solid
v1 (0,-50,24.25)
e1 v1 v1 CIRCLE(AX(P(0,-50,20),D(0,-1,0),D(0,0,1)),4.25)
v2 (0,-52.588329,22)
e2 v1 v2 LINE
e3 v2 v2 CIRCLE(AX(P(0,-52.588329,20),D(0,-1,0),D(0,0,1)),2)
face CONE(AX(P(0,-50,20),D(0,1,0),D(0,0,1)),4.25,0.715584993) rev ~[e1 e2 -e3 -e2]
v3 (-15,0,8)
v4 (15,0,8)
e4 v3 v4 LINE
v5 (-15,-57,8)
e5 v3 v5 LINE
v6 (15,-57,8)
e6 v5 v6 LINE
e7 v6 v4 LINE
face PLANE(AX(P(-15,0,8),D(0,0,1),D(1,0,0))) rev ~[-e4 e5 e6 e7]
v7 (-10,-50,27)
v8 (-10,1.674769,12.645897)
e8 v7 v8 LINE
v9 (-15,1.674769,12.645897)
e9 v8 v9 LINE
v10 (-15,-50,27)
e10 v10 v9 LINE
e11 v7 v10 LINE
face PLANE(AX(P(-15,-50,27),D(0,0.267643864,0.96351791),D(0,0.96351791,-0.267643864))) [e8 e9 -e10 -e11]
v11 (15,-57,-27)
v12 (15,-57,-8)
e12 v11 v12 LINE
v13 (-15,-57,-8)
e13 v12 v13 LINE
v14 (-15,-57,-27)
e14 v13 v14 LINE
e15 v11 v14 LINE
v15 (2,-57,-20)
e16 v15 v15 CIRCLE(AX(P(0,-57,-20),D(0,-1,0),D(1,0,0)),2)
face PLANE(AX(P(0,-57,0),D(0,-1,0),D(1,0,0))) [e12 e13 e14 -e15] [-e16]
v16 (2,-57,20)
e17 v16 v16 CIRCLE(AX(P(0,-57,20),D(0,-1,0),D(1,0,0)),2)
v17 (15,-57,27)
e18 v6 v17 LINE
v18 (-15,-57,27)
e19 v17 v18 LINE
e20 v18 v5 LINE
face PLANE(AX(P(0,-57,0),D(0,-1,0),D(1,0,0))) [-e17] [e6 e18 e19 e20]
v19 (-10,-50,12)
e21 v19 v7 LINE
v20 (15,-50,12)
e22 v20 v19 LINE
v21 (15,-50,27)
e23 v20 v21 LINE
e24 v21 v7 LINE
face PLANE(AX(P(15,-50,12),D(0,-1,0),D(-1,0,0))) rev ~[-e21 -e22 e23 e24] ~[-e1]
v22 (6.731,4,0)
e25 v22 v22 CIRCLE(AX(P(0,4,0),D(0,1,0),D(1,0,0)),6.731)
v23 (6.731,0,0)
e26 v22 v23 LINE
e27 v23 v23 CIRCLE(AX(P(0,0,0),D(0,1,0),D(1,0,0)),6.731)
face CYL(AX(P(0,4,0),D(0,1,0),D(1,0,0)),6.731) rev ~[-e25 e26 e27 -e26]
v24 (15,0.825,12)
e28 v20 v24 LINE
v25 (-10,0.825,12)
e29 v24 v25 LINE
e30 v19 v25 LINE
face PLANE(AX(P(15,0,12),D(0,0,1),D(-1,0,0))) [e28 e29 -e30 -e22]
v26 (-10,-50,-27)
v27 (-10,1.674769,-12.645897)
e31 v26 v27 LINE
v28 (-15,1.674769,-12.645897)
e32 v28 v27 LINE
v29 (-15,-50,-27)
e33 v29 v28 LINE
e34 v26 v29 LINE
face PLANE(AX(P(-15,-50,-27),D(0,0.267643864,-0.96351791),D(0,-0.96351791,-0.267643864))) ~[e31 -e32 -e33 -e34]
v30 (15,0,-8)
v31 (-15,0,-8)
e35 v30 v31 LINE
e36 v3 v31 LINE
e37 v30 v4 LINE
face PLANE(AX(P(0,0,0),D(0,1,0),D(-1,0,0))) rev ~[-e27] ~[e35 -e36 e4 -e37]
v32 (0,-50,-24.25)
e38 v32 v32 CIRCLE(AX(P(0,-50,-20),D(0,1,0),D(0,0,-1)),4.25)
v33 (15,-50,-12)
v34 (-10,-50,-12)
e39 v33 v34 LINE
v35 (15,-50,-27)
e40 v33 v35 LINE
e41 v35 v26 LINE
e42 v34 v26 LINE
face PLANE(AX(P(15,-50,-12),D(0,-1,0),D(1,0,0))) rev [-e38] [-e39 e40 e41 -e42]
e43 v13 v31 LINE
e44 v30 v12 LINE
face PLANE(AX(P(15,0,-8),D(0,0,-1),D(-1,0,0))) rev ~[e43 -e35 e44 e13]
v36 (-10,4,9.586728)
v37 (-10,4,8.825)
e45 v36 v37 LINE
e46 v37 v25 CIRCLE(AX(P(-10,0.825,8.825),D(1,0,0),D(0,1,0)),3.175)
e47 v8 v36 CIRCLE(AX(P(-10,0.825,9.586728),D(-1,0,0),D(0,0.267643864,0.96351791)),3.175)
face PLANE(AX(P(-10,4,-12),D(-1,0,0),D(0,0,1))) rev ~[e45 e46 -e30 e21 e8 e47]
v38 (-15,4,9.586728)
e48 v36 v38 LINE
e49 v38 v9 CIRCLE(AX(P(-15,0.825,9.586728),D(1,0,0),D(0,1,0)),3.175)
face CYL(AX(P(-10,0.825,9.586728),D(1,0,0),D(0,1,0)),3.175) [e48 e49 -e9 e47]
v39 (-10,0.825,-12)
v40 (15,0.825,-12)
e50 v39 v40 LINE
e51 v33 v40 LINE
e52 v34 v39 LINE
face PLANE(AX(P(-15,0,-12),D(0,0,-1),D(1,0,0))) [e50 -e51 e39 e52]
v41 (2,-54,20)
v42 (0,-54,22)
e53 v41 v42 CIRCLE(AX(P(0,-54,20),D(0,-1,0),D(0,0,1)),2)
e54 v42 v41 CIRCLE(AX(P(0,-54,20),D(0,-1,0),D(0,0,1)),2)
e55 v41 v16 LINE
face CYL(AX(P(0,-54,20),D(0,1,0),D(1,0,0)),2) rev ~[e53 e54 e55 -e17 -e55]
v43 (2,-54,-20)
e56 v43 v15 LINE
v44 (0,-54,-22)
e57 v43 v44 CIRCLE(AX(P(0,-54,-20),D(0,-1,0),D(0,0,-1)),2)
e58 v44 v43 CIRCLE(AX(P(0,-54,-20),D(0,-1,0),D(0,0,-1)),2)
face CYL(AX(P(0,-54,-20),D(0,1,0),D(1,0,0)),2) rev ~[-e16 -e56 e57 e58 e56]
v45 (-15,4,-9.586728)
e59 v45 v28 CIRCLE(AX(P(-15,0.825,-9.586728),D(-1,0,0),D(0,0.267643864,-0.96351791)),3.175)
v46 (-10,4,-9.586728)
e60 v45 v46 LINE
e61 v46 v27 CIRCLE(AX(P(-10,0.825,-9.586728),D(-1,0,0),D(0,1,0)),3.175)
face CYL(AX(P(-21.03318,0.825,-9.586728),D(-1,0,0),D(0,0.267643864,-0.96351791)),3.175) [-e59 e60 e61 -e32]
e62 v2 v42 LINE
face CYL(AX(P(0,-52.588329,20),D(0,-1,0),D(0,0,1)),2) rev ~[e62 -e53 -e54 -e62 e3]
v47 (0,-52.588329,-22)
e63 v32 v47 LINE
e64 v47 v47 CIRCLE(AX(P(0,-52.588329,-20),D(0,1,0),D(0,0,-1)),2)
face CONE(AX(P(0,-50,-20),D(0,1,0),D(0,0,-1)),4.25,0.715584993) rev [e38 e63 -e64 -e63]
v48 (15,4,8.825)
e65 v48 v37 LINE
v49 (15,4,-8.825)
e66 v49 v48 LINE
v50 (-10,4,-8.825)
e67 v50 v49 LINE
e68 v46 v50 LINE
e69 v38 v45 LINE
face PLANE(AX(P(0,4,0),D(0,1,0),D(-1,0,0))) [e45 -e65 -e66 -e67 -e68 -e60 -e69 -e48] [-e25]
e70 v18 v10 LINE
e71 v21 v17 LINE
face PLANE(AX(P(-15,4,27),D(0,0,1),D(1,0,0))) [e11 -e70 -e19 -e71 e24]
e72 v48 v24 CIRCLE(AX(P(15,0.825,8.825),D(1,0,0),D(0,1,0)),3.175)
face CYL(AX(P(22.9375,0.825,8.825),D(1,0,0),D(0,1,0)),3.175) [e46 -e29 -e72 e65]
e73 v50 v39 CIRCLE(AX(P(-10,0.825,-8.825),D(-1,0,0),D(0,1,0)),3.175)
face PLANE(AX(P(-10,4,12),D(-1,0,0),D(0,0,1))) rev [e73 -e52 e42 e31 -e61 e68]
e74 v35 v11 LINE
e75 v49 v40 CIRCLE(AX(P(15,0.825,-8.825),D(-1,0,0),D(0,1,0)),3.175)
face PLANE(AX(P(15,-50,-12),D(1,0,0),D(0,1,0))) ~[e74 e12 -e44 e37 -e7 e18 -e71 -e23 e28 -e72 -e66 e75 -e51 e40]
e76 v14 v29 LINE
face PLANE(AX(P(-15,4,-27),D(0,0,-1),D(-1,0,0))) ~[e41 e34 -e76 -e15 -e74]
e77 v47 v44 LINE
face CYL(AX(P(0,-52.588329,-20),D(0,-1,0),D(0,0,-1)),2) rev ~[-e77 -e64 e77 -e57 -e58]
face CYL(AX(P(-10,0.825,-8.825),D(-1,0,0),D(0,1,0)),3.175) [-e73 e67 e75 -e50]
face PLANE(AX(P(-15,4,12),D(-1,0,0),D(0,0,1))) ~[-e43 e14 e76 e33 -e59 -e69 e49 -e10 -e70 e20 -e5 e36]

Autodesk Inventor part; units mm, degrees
ref_plane "YZ Plane" through (0, 0, 0) normal (1, 0, 0) x (0, 1, 0)
ref_plane "XZ Plane" through (0, 0, 0) normal (0, 1, 0) x (-1, 0, 0)
ref_plane "XY Plane" through (0, 0, 0) normal (0, 0, 1) x (1, 0, 0)
sketch "Sketch2" plane through (0, 0, 0) normal (0, 1, 0) x (-1, 0, 0)
  line L0 (-15, 12) -> (15, 12)
  line L1 (15, 12) -> (15, -12)
  line L2 (15, -12) -> (-15, -12)
  line L3 (-15, -12) -> (-15, 12)
  line L4 (-15, 12) -> (15, -12) construction
  line L5 (15, 12) -> (-15, -12) construction
  point P0 (0, 0)
  dimension "d5" = 30
  dimension "d6" = 24
extrude "Extrusion2" add sketch "Sketch2" along normal blind 4
sketch "Sketch3" plane through (0, 0, 0) normal (0, -1, 0) x (1, 0, 0)
  line L0 (-15, 12) -> (15, 12) projected
  line L1 (15, 12) -> (-15, 12)
  line L2 (-15, 12) -> (-15, 8)
  line L3 (-15, 8) -> (15, 8)
  line L4 (15, 8) -> (15, 12)
  line L5 (15, -12) -> (-15, -12) projected
  line L6 (-15, -12) -> (15, -12)
  line L7 (15, -12) -> (15, -8)
  line L8 (15, -8) -> (-15, -8)
  line L9 (-15, -8) -> (-15, -12)
  point P0 (0, 0)
  dimension "d9" = 4
  dimension "d10" = 4
extrude "Extrusion3" add sketch "Sketch3" along normal blind 54
sketch "Sketch4" plane through (-15, 4, 12) normal (0, 0, 1) x (1, 0, 0)
  line L0 (0, -58) -> (30, -58) projected
  line L1 (30, -4) -> (30, -58) projected
  line L2 (0, -58) -> (30, -58)
  line L3 (30, -58) -> (30, -54)
  line L4 (30, -54) -> (0, -54)
  line L5 (0, -54) -> (0, -58)
  point P0 (15, -4)
  dimension "d13" = 4
extrude "Extrusion4" add sketch "Sketch4" along normal blind 15
ref_plane "Work Plane1" through (-15, 0, 0) normal (0, 0, 1) x (1, 0, 0)
sketch "Sketch5" plane through (0, 4, 0) normal (0, 1, 0) x (1, 0, 0)
  line L0 (15, -8) -> (15, -27) construction
  line L1 (-15, 12) -> (15, 12) construction
  line L2 (15, -12.0945) -> (-15, 12) construction
  line L3 (-15, 12) -> (15, 12) construction
  line L4 (15, 12) -> (-15, -12.0945) construction
  circle A0 centre (0, 0) radius 6.731
  dimension "d16" = 13.462
extrude "Extrusion5" cut sketch "Sketch5" against normal blind 15.1625
sketch "Sketch6" plane through (-15, -50, 12) normal (0, 1, 0) x (1, 0, 0)
  line L0 (30, -15) -> (0, -15) construction
  line L1 (15, -15) -> (15, -8) construction
  point P0 (15, 12)
  dimension "d19" = 7
hole "Hole1" at (0, -50, 20) direction (0, -1, 0) diameter 4 end through all countersink diameter 8.5 countersink angle 82
sketch "Sketch7" plane through (-15, 4, -12) normal (-1, 0, 0) x (0, 0, 1)
  line L0 (24, -54) -> (39, -54) projected
  line L1 (24, -54) -> (24, 0) projected
  line L2 (39, -54) -> (24, 0)
  line L3 (24, 0) -> (24, -54)
  line L4 (24, -54) -> (39, -54)
  point P0 (12, -4)
extrude "Extrusion6" add sketch "Sketch7" against normal blind 5
mirror "Mirror1" about plane through (-15, 0, 0) normal (0, 0, 1) of "Hole1", "Extrusion6", "Extrusion4"
fillet "Fillet2" radius 3.175 4 edges at (2.5, 4, -12) (-12.5, 4, -12) (2.5, 4, 12) (-12.5, 4, 12)
sketch "Sketch8" plane through (0, -54, 0) normal (0, -1, 0) x (1, 0, 0)
  line L0 (15, 8) -> (15, 27) projected
  line L1 (-15, 8) -> (15, 8) projected
  line L2 (15, 27) -> (-15, 27)
  line L3 (-15, 27) -> (-15, 8)
  line L4 (-15, 8) -> (15, 8)
  line L5 (15, 8) -> (15, 27)
  line L6 (15, 8) -> (15, -8) projected
  line L7 (-10, -27) -> (-15, -27) projected
  line L8 (15, -8) -> (-15, -8)
  line L9 (-15, -8) -> (-15, -27)
  line L10 (-15, -27) -> (15, -27)
  line L11 (15, -27) -> (15, -8)
  circle A0 centre (0, 20) radius 2 projected
  line L12 (-15, 8) -> (-15, 27) projected
  line L13 (-15, 8) -> (15, 8) projected
  line L14 (15, 8) -> (15, 27) projected
  line L15 (-15, 27) -> (15, 27) projected
  circle A1 centre (0, 20) radius 2 projected
  circle A2 centre (0, -20) radius 2 projected
  point P0 (0, 0)
extrude "Extrusion7" add sketch "Sketch8" along normal blind 3
properties part number "Main Power Switch Bracket"
